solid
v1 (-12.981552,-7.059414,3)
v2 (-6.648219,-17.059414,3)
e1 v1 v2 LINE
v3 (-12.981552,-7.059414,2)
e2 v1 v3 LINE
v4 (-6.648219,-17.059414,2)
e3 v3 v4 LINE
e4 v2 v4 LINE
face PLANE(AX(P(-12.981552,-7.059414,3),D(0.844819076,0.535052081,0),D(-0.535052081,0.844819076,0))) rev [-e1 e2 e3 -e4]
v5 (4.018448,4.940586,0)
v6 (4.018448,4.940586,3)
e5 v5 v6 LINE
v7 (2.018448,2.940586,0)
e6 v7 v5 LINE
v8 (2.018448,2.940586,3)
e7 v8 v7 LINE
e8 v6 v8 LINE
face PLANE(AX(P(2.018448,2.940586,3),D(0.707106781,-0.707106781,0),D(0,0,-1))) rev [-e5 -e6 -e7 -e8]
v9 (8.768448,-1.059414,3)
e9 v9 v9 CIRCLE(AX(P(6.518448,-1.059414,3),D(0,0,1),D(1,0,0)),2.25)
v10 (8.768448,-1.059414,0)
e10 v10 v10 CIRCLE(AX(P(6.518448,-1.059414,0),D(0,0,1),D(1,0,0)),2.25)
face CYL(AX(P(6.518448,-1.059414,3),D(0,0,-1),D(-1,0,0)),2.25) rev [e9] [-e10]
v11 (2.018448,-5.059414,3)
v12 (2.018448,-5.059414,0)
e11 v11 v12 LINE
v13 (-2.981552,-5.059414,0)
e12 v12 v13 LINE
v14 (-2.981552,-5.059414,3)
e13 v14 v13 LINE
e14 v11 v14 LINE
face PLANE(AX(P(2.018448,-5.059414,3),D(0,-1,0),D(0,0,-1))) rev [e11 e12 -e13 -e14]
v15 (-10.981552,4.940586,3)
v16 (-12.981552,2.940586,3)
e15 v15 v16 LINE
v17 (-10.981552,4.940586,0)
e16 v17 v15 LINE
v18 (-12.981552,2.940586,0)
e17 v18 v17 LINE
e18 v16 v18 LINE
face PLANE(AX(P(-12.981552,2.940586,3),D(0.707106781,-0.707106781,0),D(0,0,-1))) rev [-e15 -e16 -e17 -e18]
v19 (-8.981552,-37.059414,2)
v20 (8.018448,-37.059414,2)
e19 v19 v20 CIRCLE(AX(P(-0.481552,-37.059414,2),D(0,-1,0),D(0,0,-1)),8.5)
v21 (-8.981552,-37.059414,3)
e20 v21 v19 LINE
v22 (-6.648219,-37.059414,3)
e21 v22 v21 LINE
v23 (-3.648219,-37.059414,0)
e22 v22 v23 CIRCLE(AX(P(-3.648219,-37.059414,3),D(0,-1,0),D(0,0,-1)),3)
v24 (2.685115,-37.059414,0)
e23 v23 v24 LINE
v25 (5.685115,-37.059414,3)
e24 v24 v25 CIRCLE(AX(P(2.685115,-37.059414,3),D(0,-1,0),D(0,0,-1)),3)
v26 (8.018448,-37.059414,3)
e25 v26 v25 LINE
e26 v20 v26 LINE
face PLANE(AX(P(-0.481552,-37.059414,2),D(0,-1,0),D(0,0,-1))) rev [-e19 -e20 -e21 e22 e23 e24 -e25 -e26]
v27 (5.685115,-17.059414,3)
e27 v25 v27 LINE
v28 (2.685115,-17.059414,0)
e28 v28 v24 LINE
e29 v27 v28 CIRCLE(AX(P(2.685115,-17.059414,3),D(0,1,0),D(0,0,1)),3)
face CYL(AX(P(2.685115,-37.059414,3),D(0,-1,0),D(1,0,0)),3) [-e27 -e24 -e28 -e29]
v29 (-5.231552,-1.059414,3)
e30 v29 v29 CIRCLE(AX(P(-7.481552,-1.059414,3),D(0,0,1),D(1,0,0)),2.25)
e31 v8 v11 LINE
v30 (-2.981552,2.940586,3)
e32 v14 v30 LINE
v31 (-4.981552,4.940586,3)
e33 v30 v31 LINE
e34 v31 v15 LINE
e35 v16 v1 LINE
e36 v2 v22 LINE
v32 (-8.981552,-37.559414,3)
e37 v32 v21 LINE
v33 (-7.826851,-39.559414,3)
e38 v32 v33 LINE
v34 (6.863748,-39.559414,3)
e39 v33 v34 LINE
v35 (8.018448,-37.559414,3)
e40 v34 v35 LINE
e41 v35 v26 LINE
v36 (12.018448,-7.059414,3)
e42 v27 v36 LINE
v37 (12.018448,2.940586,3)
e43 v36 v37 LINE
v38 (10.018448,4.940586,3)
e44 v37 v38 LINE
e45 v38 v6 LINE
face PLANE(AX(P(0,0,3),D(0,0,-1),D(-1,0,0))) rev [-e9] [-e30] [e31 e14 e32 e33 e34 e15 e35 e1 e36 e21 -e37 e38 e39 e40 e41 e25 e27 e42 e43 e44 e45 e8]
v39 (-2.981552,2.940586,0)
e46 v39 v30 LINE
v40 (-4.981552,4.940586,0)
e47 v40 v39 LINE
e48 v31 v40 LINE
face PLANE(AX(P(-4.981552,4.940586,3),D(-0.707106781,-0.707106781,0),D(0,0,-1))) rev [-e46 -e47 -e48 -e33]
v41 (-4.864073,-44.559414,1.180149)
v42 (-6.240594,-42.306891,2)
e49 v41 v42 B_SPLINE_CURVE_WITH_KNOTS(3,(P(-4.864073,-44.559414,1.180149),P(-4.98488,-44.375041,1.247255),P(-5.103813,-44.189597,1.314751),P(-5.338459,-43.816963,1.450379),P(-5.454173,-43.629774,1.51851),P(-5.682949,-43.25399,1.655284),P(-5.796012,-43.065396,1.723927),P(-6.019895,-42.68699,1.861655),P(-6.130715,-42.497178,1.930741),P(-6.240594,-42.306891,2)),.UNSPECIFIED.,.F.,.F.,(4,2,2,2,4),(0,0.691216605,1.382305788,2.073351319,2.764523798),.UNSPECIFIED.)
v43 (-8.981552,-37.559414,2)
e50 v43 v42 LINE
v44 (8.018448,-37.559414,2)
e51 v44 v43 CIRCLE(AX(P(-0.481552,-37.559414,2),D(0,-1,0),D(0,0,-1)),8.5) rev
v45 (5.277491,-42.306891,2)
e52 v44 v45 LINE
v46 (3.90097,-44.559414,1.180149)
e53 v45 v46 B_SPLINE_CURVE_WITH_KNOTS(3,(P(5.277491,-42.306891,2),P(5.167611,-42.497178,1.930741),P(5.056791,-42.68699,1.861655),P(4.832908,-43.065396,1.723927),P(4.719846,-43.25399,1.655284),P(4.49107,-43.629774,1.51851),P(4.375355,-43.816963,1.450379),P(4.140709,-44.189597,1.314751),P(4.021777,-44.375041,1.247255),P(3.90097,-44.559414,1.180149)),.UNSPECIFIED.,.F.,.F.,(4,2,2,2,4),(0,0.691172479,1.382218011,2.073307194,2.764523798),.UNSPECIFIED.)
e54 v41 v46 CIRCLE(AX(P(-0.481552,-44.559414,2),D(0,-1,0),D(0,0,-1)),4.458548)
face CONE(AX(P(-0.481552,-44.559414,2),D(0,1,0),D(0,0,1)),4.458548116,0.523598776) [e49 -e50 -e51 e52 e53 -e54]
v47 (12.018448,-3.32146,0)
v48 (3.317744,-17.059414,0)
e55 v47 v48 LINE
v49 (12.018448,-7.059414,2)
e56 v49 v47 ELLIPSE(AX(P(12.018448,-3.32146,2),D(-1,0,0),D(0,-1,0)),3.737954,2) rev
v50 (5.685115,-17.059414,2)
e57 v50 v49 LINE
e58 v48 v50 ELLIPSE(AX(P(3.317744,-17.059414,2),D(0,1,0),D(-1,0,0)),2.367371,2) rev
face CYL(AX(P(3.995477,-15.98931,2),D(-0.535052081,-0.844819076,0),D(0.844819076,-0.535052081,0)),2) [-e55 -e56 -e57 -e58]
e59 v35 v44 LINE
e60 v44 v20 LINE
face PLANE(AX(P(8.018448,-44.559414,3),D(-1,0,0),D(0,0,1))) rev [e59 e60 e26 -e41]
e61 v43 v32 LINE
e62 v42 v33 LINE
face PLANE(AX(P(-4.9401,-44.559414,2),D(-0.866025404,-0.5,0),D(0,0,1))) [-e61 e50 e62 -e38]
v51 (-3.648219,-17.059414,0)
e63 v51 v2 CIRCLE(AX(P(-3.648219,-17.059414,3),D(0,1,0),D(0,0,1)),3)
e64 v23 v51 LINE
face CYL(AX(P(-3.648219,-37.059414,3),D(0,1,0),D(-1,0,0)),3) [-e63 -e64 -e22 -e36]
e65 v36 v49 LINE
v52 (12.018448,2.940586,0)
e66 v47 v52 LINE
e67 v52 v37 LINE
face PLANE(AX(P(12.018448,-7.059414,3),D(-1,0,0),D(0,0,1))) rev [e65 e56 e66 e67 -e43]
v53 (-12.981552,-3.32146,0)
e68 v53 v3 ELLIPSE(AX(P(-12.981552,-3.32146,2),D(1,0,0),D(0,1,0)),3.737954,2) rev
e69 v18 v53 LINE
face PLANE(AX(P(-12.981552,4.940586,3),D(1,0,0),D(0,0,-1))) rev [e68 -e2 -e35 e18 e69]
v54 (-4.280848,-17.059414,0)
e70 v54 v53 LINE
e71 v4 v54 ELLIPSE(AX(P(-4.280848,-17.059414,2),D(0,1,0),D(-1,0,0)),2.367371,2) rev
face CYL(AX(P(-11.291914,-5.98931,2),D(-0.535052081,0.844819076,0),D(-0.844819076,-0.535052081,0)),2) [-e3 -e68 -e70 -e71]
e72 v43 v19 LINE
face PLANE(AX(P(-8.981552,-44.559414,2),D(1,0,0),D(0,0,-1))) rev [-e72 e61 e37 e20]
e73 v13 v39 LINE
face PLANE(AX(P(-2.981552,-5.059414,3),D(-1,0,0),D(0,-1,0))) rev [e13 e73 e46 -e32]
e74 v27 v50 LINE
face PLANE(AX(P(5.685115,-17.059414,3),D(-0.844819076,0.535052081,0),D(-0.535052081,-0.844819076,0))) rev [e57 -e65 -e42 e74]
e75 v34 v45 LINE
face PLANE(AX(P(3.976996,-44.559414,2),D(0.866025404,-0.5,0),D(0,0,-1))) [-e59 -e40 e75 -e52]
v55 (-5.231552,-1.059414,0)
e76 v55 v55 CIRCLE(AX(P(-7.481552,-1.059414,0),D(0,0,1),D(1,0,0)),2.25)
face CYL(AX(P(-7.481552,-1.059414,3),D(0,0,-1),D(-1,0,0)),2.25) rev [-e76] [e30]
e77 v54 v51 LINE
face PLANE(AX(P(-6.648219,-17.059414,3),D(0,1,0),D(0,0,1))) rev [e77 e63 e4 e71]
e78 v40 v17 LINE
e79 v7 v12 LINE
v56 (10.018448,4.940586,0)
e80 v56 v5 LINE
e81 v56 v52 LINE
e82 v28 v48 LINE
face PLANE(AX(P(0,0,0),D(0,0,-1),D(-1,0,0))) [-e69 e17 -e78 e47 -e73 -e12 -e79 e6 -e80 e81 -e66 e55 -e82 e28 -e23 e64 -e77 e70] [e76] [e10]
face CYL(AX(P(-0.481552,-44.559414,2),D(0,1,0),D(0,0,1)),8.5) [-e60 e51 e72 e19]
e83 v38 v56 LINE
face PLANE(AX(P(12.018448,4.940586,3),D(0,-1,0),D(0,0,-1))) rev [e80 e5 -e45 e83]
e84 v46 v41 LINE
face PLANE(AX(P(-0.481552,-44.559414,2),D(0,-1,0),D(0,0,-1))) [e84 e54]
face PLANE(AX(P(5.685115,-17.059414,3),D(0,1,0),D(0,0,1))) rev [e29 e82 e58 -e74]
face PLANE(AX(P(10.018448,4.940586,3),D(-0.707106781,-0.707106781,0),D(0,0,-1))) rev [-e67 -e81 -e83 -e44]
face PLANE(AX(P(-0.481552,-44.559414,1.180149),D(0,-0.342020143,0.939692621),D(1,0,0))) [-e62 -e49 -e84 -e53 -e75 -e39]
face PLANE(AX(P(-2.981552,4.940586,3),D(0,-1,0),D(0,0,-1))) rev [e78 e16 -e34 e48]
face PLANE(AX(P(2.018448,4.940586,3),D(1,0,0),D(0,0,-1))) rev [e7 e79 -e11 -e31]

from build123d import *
from OCP.BRepFilletAPI import BRepFilletAPI_MakeChamfer

# Parameters (mm, degrees)
SKETCH1_R           = 2.25
BOSS_EXTRUDE1_DEPTH = 3
BOSS_EXTRUDE2_DEPTH = 3
BOSS_EXTRUDE3_DEPTH = 7.5
CHAMFER1_SIZE       = 7
CHAMFER1_SIZE2      = 4.041451884
CUT_EXTRUDE1_DEPTH  = 47.864827652
FILLET1_R           = 3
CHAMFER2_SIZE       = 2
CHAMFER2_SIZE2      = 2.328114762
CHAMFER3_SIZE       = 5
CHAMFER3_SIZE2      = 1.819851171
CUT_EXTRUDE2_DEPTH  = 47.864827652
FILLET2_R           = 2


with BuildPart() as part:
    # Sketch1 → Boss-Extrude1 (new body)
    with BuildSketch(Plane.XY):
        Polygon((2.018448149, -5.059414071), (-2.981551851, -5.059414071), (-2.981551851, 4.940585929), (-12.981551851, 4.940585929), (-12.981551851, -7.059414071), (12.018448149, -7.059414071), (12.018448149, 4.940585929), (2.018448149, 4.940585929), align=None)
        with Locations((6.518448149, -1.059414071)):
            Circle(SKETCH1_R, mode=Mode.SUBTRACT)
        with Locations((-7.481551851, -1.059414071)):
            Circle(SKETCH1_R, mode=Mode.SUBTRACT)
    extrude(amount=BOSS_EXTRUDE1_DEPTH)

    # Sketch2 → Boss-Extrude2 (add, through all)
    with BuildSketch(Plane.XY.offset(3)):
        Polygon((-12.981551851, -7.059414071), (-8.981551851, -37.059414071), (8.018448149, -37.059414071), (12.018448149, -7.059414071), align=None)
    extrude(amount=-BOSS_EXTRUDE2_DEPTH)

    # Sketch4 → Boss-Extrude3 (add)
    with BuildSketch(Plane.XZ.offset(37.059414071)):
        with BuildLine():
            Line((-8.981551851, 2), (-8.981551851, 3))
            Line((-8.981551851, 3), (8.018448149, 3))
            Line((8.018448149, 3), (8.018448149, 2))
            ThreePointArc((8.018448149, 2), (-0.481551851, -6.5), (-8.981551851, 2))
        make_face()
    extrude(amount=BOSS_EXTRUDE3_DEPTH)

    # Chamfer1: one chamfer whose edges measure the first distance from different faces: ONE call of the kernel's chamfer builder (chamfer() names one face for all edges)
    chamfer1_edges_1 = [part.edges().sort_by_distance(p)[0] for p in [
        (-0.481551851, -44.559414071, -6.5),
    ]]
    chamfer1_side_1 = [part.faces().sort_by_distance(p)[0] for p in [
        (-0.481551851, -40.809414071, -6.5),
    ]]
    chamfer1_edges_2 = [part.edges().sort_by_distance(p)[0] for p in [
        (8.018448149, -44.559414071, 2.5),
    ]]
    chamfer1_side_2 = [part.faces().sort_by_distance(p)[0] for p in [
        (8.018448149, -40.809414071, 2.5),
    ]]
    chamfer1_edges_3 = [part.edges().sort_by_distance(p)[0] for p in [
        (-8.981551851, -44.559414071, 2.5),
    ]]
    chamfer1_side_3 = [part.faces().sort_by_distance(p)[0] for p in [
        (-8.981551851, -40.809414071, 2.5),
    ]]
    chamfer1 = BRepFilletAPI_MakeChamfer(part.part.solid().wrapped)
    for e in chamfer1_edges_1:
        chamfer1.Add(CHAMFER1_SIZE, CHAMFER1_SIZE2, e.wrapped, chamfer1_side_1[0].wrapped)  # the first distance lies on this face
    for e in chamfer1_edges_2:
        chamfer1.Add(CHAMFER1_SIZE, CHAMFER1_SIZE2, e.wrapped, chamfer1_side_2[0].wrapped)  # the first distance lies on this face
    for e in chamfer1_edges_3:
        chamfer1.Add(CHAMFER1_SIZE, CHAMFER1_SIZE2, e.wrapped, chamfer1_side_3[0].wrapped)  # the first distance lies on this face
    add(Compound.cast(chamfer1.Shape()), mode=Mode.REPLACE)

    # Sketch5 → Cut-Extrude1 (cut, through all)
    with BuildSketch(Plane(origin=(0, 0, 0), x_dir=(-1, 0, 0), z_dir=(0, 0, -1))):
        Polygon((6.648218517, -37.059414071), (6.648218517, -17.059414071), (11.648218517, -17.059414071), (8.981551851, -37.059414071), align=None)
        Polygon((-10.685114816, -17.059414071), (-8.018448149, -37.059414071), (-5.685114816, -37.059414071), (-5.685114816, -17.059414071), align=None)
    extrude(amount=-CUT_EXTRUDE1_DEPTH, mode=Mode.SUBTRACT)

    # Fillet1
    fillet1_edges = [part.edges().sort_by_distance(p)[0] for p in [
        (5.685114816, -27.059414071, 0),
        (-6.648218517, -27.059414071, 0),
    ]]
    fillet(fillet1_edges, radius=FILLET1_R - 0.0001)  # a hair under: the kernel refuses the full size

    # Chamfer2: one chamfer whose edges measure the first distance from different faces: ONE call of the kernel's chamfer builder (chamfer() names one face for all edges)
    chamfer2_edges_1 = [part.edges().sort_by_distance(p)[0] for p in [
        (2.018448149, 4.940585929, 1.5),
        (12.018448149, 4.940585929, 1.5),
        (-12.981551851, 4.940585929, 1.5),
        (-2.981551851, 4.940585929, 1.5),
    ]]
    chamfer2_edges_2 = [part.edges().sort_by_distance(p)[0] for p in [
        (-11.648218517, -17.059414071, 1.5),
    ]]
    chamfer2_side_2 = [part.faces().sort_by_distance(p)[0] for p in [
        (-12.314885184, -12.059414071, 1.5),
    ]]
    chamfer2_edges_3 = [part.edges().sort_by_distance(p)[0] for p in [
        (10.685114816, -17.059414071, 1.5),
    ]]
    chamfer2_side_3 = [part.faces().sort_by_distance(p)[0] for p in [
        (7.823515647, -17.059414071, 1.405334343),
    ]]
    chamfer2 = BRepFilletAPI_MakeChamfer(part.part.solid().wrapped)
    for e in chamfer2_edges_1:
        chamfer2.Add(CHAMFER2_SIZE, e.wrapped)
    for e in chamfer2_edges_2:
        chamfer2.Add(CHAMFER2_SIZE, CHAMFER2_SIZE2, e.wrapped, chamfer2_side_2[0].wrapped)  # the first distance lies on this face
    for e in chamfer2_edges_3:
        chamfer2.Add(CHAMFER2_SIZE, CHAMFER2_SIZE2, e.wrapped, chamfer2_side_3[0].wrapped)  # the first distance lies on this face
    add(Compound.cast(chamfer2.Shape()), mode=Mode.REPLACE)

    # Chamfer3
    chamfer3_edges = [part.edges().sort_by_distance(p)[0] for p in [
        (-0.481551851, -44.559414071, 3),
    ]]
    chamfer3_side = [part.faces().sort_by_distance(p)[0] for p in [
        (-0.481914427, -17.452973587, 3),
    ]]
    chamfer(chamfer3_edges, length=CHAMFER3_SIZE, length2=CHAMFER3_SIZE2, reference=chamfer3_side[0])

    # Sketch6 → Cut-Extrude2 (cut, through all)
    with BuildSketch(Plane(origin=(0, 0, 0), x_dir=(-1, 0, 0), z_dir=(0, 0, -1))):
        Polygon((-5.685114816, -17.059414071), (-12.018448149, -7.059414071), (-10.992807124, -14.751721764), (-8.685114816, -17.059414071), align=None)
        Polygon((12.981551851, -7.059414071), (6.648218517, -17.059414071), (9.320103756, -17.059414071), (11.912545957, -15.07695827), align=None)
    extrude(amount=-CUT_EXTRUDE2_DEPTH, mode=Mode.SUBTRACT)

    # Fillet2
    fillet2_edges = [part.edges().sort_by_distance(p)[0] for p in [
        (8.851781483, -12.059414071, 0),
        (-9.814885184, -12.059414071, 0),
    ]]
    fillet(fillet2_edges, radius=FILLET2_R)


solid = part.part
